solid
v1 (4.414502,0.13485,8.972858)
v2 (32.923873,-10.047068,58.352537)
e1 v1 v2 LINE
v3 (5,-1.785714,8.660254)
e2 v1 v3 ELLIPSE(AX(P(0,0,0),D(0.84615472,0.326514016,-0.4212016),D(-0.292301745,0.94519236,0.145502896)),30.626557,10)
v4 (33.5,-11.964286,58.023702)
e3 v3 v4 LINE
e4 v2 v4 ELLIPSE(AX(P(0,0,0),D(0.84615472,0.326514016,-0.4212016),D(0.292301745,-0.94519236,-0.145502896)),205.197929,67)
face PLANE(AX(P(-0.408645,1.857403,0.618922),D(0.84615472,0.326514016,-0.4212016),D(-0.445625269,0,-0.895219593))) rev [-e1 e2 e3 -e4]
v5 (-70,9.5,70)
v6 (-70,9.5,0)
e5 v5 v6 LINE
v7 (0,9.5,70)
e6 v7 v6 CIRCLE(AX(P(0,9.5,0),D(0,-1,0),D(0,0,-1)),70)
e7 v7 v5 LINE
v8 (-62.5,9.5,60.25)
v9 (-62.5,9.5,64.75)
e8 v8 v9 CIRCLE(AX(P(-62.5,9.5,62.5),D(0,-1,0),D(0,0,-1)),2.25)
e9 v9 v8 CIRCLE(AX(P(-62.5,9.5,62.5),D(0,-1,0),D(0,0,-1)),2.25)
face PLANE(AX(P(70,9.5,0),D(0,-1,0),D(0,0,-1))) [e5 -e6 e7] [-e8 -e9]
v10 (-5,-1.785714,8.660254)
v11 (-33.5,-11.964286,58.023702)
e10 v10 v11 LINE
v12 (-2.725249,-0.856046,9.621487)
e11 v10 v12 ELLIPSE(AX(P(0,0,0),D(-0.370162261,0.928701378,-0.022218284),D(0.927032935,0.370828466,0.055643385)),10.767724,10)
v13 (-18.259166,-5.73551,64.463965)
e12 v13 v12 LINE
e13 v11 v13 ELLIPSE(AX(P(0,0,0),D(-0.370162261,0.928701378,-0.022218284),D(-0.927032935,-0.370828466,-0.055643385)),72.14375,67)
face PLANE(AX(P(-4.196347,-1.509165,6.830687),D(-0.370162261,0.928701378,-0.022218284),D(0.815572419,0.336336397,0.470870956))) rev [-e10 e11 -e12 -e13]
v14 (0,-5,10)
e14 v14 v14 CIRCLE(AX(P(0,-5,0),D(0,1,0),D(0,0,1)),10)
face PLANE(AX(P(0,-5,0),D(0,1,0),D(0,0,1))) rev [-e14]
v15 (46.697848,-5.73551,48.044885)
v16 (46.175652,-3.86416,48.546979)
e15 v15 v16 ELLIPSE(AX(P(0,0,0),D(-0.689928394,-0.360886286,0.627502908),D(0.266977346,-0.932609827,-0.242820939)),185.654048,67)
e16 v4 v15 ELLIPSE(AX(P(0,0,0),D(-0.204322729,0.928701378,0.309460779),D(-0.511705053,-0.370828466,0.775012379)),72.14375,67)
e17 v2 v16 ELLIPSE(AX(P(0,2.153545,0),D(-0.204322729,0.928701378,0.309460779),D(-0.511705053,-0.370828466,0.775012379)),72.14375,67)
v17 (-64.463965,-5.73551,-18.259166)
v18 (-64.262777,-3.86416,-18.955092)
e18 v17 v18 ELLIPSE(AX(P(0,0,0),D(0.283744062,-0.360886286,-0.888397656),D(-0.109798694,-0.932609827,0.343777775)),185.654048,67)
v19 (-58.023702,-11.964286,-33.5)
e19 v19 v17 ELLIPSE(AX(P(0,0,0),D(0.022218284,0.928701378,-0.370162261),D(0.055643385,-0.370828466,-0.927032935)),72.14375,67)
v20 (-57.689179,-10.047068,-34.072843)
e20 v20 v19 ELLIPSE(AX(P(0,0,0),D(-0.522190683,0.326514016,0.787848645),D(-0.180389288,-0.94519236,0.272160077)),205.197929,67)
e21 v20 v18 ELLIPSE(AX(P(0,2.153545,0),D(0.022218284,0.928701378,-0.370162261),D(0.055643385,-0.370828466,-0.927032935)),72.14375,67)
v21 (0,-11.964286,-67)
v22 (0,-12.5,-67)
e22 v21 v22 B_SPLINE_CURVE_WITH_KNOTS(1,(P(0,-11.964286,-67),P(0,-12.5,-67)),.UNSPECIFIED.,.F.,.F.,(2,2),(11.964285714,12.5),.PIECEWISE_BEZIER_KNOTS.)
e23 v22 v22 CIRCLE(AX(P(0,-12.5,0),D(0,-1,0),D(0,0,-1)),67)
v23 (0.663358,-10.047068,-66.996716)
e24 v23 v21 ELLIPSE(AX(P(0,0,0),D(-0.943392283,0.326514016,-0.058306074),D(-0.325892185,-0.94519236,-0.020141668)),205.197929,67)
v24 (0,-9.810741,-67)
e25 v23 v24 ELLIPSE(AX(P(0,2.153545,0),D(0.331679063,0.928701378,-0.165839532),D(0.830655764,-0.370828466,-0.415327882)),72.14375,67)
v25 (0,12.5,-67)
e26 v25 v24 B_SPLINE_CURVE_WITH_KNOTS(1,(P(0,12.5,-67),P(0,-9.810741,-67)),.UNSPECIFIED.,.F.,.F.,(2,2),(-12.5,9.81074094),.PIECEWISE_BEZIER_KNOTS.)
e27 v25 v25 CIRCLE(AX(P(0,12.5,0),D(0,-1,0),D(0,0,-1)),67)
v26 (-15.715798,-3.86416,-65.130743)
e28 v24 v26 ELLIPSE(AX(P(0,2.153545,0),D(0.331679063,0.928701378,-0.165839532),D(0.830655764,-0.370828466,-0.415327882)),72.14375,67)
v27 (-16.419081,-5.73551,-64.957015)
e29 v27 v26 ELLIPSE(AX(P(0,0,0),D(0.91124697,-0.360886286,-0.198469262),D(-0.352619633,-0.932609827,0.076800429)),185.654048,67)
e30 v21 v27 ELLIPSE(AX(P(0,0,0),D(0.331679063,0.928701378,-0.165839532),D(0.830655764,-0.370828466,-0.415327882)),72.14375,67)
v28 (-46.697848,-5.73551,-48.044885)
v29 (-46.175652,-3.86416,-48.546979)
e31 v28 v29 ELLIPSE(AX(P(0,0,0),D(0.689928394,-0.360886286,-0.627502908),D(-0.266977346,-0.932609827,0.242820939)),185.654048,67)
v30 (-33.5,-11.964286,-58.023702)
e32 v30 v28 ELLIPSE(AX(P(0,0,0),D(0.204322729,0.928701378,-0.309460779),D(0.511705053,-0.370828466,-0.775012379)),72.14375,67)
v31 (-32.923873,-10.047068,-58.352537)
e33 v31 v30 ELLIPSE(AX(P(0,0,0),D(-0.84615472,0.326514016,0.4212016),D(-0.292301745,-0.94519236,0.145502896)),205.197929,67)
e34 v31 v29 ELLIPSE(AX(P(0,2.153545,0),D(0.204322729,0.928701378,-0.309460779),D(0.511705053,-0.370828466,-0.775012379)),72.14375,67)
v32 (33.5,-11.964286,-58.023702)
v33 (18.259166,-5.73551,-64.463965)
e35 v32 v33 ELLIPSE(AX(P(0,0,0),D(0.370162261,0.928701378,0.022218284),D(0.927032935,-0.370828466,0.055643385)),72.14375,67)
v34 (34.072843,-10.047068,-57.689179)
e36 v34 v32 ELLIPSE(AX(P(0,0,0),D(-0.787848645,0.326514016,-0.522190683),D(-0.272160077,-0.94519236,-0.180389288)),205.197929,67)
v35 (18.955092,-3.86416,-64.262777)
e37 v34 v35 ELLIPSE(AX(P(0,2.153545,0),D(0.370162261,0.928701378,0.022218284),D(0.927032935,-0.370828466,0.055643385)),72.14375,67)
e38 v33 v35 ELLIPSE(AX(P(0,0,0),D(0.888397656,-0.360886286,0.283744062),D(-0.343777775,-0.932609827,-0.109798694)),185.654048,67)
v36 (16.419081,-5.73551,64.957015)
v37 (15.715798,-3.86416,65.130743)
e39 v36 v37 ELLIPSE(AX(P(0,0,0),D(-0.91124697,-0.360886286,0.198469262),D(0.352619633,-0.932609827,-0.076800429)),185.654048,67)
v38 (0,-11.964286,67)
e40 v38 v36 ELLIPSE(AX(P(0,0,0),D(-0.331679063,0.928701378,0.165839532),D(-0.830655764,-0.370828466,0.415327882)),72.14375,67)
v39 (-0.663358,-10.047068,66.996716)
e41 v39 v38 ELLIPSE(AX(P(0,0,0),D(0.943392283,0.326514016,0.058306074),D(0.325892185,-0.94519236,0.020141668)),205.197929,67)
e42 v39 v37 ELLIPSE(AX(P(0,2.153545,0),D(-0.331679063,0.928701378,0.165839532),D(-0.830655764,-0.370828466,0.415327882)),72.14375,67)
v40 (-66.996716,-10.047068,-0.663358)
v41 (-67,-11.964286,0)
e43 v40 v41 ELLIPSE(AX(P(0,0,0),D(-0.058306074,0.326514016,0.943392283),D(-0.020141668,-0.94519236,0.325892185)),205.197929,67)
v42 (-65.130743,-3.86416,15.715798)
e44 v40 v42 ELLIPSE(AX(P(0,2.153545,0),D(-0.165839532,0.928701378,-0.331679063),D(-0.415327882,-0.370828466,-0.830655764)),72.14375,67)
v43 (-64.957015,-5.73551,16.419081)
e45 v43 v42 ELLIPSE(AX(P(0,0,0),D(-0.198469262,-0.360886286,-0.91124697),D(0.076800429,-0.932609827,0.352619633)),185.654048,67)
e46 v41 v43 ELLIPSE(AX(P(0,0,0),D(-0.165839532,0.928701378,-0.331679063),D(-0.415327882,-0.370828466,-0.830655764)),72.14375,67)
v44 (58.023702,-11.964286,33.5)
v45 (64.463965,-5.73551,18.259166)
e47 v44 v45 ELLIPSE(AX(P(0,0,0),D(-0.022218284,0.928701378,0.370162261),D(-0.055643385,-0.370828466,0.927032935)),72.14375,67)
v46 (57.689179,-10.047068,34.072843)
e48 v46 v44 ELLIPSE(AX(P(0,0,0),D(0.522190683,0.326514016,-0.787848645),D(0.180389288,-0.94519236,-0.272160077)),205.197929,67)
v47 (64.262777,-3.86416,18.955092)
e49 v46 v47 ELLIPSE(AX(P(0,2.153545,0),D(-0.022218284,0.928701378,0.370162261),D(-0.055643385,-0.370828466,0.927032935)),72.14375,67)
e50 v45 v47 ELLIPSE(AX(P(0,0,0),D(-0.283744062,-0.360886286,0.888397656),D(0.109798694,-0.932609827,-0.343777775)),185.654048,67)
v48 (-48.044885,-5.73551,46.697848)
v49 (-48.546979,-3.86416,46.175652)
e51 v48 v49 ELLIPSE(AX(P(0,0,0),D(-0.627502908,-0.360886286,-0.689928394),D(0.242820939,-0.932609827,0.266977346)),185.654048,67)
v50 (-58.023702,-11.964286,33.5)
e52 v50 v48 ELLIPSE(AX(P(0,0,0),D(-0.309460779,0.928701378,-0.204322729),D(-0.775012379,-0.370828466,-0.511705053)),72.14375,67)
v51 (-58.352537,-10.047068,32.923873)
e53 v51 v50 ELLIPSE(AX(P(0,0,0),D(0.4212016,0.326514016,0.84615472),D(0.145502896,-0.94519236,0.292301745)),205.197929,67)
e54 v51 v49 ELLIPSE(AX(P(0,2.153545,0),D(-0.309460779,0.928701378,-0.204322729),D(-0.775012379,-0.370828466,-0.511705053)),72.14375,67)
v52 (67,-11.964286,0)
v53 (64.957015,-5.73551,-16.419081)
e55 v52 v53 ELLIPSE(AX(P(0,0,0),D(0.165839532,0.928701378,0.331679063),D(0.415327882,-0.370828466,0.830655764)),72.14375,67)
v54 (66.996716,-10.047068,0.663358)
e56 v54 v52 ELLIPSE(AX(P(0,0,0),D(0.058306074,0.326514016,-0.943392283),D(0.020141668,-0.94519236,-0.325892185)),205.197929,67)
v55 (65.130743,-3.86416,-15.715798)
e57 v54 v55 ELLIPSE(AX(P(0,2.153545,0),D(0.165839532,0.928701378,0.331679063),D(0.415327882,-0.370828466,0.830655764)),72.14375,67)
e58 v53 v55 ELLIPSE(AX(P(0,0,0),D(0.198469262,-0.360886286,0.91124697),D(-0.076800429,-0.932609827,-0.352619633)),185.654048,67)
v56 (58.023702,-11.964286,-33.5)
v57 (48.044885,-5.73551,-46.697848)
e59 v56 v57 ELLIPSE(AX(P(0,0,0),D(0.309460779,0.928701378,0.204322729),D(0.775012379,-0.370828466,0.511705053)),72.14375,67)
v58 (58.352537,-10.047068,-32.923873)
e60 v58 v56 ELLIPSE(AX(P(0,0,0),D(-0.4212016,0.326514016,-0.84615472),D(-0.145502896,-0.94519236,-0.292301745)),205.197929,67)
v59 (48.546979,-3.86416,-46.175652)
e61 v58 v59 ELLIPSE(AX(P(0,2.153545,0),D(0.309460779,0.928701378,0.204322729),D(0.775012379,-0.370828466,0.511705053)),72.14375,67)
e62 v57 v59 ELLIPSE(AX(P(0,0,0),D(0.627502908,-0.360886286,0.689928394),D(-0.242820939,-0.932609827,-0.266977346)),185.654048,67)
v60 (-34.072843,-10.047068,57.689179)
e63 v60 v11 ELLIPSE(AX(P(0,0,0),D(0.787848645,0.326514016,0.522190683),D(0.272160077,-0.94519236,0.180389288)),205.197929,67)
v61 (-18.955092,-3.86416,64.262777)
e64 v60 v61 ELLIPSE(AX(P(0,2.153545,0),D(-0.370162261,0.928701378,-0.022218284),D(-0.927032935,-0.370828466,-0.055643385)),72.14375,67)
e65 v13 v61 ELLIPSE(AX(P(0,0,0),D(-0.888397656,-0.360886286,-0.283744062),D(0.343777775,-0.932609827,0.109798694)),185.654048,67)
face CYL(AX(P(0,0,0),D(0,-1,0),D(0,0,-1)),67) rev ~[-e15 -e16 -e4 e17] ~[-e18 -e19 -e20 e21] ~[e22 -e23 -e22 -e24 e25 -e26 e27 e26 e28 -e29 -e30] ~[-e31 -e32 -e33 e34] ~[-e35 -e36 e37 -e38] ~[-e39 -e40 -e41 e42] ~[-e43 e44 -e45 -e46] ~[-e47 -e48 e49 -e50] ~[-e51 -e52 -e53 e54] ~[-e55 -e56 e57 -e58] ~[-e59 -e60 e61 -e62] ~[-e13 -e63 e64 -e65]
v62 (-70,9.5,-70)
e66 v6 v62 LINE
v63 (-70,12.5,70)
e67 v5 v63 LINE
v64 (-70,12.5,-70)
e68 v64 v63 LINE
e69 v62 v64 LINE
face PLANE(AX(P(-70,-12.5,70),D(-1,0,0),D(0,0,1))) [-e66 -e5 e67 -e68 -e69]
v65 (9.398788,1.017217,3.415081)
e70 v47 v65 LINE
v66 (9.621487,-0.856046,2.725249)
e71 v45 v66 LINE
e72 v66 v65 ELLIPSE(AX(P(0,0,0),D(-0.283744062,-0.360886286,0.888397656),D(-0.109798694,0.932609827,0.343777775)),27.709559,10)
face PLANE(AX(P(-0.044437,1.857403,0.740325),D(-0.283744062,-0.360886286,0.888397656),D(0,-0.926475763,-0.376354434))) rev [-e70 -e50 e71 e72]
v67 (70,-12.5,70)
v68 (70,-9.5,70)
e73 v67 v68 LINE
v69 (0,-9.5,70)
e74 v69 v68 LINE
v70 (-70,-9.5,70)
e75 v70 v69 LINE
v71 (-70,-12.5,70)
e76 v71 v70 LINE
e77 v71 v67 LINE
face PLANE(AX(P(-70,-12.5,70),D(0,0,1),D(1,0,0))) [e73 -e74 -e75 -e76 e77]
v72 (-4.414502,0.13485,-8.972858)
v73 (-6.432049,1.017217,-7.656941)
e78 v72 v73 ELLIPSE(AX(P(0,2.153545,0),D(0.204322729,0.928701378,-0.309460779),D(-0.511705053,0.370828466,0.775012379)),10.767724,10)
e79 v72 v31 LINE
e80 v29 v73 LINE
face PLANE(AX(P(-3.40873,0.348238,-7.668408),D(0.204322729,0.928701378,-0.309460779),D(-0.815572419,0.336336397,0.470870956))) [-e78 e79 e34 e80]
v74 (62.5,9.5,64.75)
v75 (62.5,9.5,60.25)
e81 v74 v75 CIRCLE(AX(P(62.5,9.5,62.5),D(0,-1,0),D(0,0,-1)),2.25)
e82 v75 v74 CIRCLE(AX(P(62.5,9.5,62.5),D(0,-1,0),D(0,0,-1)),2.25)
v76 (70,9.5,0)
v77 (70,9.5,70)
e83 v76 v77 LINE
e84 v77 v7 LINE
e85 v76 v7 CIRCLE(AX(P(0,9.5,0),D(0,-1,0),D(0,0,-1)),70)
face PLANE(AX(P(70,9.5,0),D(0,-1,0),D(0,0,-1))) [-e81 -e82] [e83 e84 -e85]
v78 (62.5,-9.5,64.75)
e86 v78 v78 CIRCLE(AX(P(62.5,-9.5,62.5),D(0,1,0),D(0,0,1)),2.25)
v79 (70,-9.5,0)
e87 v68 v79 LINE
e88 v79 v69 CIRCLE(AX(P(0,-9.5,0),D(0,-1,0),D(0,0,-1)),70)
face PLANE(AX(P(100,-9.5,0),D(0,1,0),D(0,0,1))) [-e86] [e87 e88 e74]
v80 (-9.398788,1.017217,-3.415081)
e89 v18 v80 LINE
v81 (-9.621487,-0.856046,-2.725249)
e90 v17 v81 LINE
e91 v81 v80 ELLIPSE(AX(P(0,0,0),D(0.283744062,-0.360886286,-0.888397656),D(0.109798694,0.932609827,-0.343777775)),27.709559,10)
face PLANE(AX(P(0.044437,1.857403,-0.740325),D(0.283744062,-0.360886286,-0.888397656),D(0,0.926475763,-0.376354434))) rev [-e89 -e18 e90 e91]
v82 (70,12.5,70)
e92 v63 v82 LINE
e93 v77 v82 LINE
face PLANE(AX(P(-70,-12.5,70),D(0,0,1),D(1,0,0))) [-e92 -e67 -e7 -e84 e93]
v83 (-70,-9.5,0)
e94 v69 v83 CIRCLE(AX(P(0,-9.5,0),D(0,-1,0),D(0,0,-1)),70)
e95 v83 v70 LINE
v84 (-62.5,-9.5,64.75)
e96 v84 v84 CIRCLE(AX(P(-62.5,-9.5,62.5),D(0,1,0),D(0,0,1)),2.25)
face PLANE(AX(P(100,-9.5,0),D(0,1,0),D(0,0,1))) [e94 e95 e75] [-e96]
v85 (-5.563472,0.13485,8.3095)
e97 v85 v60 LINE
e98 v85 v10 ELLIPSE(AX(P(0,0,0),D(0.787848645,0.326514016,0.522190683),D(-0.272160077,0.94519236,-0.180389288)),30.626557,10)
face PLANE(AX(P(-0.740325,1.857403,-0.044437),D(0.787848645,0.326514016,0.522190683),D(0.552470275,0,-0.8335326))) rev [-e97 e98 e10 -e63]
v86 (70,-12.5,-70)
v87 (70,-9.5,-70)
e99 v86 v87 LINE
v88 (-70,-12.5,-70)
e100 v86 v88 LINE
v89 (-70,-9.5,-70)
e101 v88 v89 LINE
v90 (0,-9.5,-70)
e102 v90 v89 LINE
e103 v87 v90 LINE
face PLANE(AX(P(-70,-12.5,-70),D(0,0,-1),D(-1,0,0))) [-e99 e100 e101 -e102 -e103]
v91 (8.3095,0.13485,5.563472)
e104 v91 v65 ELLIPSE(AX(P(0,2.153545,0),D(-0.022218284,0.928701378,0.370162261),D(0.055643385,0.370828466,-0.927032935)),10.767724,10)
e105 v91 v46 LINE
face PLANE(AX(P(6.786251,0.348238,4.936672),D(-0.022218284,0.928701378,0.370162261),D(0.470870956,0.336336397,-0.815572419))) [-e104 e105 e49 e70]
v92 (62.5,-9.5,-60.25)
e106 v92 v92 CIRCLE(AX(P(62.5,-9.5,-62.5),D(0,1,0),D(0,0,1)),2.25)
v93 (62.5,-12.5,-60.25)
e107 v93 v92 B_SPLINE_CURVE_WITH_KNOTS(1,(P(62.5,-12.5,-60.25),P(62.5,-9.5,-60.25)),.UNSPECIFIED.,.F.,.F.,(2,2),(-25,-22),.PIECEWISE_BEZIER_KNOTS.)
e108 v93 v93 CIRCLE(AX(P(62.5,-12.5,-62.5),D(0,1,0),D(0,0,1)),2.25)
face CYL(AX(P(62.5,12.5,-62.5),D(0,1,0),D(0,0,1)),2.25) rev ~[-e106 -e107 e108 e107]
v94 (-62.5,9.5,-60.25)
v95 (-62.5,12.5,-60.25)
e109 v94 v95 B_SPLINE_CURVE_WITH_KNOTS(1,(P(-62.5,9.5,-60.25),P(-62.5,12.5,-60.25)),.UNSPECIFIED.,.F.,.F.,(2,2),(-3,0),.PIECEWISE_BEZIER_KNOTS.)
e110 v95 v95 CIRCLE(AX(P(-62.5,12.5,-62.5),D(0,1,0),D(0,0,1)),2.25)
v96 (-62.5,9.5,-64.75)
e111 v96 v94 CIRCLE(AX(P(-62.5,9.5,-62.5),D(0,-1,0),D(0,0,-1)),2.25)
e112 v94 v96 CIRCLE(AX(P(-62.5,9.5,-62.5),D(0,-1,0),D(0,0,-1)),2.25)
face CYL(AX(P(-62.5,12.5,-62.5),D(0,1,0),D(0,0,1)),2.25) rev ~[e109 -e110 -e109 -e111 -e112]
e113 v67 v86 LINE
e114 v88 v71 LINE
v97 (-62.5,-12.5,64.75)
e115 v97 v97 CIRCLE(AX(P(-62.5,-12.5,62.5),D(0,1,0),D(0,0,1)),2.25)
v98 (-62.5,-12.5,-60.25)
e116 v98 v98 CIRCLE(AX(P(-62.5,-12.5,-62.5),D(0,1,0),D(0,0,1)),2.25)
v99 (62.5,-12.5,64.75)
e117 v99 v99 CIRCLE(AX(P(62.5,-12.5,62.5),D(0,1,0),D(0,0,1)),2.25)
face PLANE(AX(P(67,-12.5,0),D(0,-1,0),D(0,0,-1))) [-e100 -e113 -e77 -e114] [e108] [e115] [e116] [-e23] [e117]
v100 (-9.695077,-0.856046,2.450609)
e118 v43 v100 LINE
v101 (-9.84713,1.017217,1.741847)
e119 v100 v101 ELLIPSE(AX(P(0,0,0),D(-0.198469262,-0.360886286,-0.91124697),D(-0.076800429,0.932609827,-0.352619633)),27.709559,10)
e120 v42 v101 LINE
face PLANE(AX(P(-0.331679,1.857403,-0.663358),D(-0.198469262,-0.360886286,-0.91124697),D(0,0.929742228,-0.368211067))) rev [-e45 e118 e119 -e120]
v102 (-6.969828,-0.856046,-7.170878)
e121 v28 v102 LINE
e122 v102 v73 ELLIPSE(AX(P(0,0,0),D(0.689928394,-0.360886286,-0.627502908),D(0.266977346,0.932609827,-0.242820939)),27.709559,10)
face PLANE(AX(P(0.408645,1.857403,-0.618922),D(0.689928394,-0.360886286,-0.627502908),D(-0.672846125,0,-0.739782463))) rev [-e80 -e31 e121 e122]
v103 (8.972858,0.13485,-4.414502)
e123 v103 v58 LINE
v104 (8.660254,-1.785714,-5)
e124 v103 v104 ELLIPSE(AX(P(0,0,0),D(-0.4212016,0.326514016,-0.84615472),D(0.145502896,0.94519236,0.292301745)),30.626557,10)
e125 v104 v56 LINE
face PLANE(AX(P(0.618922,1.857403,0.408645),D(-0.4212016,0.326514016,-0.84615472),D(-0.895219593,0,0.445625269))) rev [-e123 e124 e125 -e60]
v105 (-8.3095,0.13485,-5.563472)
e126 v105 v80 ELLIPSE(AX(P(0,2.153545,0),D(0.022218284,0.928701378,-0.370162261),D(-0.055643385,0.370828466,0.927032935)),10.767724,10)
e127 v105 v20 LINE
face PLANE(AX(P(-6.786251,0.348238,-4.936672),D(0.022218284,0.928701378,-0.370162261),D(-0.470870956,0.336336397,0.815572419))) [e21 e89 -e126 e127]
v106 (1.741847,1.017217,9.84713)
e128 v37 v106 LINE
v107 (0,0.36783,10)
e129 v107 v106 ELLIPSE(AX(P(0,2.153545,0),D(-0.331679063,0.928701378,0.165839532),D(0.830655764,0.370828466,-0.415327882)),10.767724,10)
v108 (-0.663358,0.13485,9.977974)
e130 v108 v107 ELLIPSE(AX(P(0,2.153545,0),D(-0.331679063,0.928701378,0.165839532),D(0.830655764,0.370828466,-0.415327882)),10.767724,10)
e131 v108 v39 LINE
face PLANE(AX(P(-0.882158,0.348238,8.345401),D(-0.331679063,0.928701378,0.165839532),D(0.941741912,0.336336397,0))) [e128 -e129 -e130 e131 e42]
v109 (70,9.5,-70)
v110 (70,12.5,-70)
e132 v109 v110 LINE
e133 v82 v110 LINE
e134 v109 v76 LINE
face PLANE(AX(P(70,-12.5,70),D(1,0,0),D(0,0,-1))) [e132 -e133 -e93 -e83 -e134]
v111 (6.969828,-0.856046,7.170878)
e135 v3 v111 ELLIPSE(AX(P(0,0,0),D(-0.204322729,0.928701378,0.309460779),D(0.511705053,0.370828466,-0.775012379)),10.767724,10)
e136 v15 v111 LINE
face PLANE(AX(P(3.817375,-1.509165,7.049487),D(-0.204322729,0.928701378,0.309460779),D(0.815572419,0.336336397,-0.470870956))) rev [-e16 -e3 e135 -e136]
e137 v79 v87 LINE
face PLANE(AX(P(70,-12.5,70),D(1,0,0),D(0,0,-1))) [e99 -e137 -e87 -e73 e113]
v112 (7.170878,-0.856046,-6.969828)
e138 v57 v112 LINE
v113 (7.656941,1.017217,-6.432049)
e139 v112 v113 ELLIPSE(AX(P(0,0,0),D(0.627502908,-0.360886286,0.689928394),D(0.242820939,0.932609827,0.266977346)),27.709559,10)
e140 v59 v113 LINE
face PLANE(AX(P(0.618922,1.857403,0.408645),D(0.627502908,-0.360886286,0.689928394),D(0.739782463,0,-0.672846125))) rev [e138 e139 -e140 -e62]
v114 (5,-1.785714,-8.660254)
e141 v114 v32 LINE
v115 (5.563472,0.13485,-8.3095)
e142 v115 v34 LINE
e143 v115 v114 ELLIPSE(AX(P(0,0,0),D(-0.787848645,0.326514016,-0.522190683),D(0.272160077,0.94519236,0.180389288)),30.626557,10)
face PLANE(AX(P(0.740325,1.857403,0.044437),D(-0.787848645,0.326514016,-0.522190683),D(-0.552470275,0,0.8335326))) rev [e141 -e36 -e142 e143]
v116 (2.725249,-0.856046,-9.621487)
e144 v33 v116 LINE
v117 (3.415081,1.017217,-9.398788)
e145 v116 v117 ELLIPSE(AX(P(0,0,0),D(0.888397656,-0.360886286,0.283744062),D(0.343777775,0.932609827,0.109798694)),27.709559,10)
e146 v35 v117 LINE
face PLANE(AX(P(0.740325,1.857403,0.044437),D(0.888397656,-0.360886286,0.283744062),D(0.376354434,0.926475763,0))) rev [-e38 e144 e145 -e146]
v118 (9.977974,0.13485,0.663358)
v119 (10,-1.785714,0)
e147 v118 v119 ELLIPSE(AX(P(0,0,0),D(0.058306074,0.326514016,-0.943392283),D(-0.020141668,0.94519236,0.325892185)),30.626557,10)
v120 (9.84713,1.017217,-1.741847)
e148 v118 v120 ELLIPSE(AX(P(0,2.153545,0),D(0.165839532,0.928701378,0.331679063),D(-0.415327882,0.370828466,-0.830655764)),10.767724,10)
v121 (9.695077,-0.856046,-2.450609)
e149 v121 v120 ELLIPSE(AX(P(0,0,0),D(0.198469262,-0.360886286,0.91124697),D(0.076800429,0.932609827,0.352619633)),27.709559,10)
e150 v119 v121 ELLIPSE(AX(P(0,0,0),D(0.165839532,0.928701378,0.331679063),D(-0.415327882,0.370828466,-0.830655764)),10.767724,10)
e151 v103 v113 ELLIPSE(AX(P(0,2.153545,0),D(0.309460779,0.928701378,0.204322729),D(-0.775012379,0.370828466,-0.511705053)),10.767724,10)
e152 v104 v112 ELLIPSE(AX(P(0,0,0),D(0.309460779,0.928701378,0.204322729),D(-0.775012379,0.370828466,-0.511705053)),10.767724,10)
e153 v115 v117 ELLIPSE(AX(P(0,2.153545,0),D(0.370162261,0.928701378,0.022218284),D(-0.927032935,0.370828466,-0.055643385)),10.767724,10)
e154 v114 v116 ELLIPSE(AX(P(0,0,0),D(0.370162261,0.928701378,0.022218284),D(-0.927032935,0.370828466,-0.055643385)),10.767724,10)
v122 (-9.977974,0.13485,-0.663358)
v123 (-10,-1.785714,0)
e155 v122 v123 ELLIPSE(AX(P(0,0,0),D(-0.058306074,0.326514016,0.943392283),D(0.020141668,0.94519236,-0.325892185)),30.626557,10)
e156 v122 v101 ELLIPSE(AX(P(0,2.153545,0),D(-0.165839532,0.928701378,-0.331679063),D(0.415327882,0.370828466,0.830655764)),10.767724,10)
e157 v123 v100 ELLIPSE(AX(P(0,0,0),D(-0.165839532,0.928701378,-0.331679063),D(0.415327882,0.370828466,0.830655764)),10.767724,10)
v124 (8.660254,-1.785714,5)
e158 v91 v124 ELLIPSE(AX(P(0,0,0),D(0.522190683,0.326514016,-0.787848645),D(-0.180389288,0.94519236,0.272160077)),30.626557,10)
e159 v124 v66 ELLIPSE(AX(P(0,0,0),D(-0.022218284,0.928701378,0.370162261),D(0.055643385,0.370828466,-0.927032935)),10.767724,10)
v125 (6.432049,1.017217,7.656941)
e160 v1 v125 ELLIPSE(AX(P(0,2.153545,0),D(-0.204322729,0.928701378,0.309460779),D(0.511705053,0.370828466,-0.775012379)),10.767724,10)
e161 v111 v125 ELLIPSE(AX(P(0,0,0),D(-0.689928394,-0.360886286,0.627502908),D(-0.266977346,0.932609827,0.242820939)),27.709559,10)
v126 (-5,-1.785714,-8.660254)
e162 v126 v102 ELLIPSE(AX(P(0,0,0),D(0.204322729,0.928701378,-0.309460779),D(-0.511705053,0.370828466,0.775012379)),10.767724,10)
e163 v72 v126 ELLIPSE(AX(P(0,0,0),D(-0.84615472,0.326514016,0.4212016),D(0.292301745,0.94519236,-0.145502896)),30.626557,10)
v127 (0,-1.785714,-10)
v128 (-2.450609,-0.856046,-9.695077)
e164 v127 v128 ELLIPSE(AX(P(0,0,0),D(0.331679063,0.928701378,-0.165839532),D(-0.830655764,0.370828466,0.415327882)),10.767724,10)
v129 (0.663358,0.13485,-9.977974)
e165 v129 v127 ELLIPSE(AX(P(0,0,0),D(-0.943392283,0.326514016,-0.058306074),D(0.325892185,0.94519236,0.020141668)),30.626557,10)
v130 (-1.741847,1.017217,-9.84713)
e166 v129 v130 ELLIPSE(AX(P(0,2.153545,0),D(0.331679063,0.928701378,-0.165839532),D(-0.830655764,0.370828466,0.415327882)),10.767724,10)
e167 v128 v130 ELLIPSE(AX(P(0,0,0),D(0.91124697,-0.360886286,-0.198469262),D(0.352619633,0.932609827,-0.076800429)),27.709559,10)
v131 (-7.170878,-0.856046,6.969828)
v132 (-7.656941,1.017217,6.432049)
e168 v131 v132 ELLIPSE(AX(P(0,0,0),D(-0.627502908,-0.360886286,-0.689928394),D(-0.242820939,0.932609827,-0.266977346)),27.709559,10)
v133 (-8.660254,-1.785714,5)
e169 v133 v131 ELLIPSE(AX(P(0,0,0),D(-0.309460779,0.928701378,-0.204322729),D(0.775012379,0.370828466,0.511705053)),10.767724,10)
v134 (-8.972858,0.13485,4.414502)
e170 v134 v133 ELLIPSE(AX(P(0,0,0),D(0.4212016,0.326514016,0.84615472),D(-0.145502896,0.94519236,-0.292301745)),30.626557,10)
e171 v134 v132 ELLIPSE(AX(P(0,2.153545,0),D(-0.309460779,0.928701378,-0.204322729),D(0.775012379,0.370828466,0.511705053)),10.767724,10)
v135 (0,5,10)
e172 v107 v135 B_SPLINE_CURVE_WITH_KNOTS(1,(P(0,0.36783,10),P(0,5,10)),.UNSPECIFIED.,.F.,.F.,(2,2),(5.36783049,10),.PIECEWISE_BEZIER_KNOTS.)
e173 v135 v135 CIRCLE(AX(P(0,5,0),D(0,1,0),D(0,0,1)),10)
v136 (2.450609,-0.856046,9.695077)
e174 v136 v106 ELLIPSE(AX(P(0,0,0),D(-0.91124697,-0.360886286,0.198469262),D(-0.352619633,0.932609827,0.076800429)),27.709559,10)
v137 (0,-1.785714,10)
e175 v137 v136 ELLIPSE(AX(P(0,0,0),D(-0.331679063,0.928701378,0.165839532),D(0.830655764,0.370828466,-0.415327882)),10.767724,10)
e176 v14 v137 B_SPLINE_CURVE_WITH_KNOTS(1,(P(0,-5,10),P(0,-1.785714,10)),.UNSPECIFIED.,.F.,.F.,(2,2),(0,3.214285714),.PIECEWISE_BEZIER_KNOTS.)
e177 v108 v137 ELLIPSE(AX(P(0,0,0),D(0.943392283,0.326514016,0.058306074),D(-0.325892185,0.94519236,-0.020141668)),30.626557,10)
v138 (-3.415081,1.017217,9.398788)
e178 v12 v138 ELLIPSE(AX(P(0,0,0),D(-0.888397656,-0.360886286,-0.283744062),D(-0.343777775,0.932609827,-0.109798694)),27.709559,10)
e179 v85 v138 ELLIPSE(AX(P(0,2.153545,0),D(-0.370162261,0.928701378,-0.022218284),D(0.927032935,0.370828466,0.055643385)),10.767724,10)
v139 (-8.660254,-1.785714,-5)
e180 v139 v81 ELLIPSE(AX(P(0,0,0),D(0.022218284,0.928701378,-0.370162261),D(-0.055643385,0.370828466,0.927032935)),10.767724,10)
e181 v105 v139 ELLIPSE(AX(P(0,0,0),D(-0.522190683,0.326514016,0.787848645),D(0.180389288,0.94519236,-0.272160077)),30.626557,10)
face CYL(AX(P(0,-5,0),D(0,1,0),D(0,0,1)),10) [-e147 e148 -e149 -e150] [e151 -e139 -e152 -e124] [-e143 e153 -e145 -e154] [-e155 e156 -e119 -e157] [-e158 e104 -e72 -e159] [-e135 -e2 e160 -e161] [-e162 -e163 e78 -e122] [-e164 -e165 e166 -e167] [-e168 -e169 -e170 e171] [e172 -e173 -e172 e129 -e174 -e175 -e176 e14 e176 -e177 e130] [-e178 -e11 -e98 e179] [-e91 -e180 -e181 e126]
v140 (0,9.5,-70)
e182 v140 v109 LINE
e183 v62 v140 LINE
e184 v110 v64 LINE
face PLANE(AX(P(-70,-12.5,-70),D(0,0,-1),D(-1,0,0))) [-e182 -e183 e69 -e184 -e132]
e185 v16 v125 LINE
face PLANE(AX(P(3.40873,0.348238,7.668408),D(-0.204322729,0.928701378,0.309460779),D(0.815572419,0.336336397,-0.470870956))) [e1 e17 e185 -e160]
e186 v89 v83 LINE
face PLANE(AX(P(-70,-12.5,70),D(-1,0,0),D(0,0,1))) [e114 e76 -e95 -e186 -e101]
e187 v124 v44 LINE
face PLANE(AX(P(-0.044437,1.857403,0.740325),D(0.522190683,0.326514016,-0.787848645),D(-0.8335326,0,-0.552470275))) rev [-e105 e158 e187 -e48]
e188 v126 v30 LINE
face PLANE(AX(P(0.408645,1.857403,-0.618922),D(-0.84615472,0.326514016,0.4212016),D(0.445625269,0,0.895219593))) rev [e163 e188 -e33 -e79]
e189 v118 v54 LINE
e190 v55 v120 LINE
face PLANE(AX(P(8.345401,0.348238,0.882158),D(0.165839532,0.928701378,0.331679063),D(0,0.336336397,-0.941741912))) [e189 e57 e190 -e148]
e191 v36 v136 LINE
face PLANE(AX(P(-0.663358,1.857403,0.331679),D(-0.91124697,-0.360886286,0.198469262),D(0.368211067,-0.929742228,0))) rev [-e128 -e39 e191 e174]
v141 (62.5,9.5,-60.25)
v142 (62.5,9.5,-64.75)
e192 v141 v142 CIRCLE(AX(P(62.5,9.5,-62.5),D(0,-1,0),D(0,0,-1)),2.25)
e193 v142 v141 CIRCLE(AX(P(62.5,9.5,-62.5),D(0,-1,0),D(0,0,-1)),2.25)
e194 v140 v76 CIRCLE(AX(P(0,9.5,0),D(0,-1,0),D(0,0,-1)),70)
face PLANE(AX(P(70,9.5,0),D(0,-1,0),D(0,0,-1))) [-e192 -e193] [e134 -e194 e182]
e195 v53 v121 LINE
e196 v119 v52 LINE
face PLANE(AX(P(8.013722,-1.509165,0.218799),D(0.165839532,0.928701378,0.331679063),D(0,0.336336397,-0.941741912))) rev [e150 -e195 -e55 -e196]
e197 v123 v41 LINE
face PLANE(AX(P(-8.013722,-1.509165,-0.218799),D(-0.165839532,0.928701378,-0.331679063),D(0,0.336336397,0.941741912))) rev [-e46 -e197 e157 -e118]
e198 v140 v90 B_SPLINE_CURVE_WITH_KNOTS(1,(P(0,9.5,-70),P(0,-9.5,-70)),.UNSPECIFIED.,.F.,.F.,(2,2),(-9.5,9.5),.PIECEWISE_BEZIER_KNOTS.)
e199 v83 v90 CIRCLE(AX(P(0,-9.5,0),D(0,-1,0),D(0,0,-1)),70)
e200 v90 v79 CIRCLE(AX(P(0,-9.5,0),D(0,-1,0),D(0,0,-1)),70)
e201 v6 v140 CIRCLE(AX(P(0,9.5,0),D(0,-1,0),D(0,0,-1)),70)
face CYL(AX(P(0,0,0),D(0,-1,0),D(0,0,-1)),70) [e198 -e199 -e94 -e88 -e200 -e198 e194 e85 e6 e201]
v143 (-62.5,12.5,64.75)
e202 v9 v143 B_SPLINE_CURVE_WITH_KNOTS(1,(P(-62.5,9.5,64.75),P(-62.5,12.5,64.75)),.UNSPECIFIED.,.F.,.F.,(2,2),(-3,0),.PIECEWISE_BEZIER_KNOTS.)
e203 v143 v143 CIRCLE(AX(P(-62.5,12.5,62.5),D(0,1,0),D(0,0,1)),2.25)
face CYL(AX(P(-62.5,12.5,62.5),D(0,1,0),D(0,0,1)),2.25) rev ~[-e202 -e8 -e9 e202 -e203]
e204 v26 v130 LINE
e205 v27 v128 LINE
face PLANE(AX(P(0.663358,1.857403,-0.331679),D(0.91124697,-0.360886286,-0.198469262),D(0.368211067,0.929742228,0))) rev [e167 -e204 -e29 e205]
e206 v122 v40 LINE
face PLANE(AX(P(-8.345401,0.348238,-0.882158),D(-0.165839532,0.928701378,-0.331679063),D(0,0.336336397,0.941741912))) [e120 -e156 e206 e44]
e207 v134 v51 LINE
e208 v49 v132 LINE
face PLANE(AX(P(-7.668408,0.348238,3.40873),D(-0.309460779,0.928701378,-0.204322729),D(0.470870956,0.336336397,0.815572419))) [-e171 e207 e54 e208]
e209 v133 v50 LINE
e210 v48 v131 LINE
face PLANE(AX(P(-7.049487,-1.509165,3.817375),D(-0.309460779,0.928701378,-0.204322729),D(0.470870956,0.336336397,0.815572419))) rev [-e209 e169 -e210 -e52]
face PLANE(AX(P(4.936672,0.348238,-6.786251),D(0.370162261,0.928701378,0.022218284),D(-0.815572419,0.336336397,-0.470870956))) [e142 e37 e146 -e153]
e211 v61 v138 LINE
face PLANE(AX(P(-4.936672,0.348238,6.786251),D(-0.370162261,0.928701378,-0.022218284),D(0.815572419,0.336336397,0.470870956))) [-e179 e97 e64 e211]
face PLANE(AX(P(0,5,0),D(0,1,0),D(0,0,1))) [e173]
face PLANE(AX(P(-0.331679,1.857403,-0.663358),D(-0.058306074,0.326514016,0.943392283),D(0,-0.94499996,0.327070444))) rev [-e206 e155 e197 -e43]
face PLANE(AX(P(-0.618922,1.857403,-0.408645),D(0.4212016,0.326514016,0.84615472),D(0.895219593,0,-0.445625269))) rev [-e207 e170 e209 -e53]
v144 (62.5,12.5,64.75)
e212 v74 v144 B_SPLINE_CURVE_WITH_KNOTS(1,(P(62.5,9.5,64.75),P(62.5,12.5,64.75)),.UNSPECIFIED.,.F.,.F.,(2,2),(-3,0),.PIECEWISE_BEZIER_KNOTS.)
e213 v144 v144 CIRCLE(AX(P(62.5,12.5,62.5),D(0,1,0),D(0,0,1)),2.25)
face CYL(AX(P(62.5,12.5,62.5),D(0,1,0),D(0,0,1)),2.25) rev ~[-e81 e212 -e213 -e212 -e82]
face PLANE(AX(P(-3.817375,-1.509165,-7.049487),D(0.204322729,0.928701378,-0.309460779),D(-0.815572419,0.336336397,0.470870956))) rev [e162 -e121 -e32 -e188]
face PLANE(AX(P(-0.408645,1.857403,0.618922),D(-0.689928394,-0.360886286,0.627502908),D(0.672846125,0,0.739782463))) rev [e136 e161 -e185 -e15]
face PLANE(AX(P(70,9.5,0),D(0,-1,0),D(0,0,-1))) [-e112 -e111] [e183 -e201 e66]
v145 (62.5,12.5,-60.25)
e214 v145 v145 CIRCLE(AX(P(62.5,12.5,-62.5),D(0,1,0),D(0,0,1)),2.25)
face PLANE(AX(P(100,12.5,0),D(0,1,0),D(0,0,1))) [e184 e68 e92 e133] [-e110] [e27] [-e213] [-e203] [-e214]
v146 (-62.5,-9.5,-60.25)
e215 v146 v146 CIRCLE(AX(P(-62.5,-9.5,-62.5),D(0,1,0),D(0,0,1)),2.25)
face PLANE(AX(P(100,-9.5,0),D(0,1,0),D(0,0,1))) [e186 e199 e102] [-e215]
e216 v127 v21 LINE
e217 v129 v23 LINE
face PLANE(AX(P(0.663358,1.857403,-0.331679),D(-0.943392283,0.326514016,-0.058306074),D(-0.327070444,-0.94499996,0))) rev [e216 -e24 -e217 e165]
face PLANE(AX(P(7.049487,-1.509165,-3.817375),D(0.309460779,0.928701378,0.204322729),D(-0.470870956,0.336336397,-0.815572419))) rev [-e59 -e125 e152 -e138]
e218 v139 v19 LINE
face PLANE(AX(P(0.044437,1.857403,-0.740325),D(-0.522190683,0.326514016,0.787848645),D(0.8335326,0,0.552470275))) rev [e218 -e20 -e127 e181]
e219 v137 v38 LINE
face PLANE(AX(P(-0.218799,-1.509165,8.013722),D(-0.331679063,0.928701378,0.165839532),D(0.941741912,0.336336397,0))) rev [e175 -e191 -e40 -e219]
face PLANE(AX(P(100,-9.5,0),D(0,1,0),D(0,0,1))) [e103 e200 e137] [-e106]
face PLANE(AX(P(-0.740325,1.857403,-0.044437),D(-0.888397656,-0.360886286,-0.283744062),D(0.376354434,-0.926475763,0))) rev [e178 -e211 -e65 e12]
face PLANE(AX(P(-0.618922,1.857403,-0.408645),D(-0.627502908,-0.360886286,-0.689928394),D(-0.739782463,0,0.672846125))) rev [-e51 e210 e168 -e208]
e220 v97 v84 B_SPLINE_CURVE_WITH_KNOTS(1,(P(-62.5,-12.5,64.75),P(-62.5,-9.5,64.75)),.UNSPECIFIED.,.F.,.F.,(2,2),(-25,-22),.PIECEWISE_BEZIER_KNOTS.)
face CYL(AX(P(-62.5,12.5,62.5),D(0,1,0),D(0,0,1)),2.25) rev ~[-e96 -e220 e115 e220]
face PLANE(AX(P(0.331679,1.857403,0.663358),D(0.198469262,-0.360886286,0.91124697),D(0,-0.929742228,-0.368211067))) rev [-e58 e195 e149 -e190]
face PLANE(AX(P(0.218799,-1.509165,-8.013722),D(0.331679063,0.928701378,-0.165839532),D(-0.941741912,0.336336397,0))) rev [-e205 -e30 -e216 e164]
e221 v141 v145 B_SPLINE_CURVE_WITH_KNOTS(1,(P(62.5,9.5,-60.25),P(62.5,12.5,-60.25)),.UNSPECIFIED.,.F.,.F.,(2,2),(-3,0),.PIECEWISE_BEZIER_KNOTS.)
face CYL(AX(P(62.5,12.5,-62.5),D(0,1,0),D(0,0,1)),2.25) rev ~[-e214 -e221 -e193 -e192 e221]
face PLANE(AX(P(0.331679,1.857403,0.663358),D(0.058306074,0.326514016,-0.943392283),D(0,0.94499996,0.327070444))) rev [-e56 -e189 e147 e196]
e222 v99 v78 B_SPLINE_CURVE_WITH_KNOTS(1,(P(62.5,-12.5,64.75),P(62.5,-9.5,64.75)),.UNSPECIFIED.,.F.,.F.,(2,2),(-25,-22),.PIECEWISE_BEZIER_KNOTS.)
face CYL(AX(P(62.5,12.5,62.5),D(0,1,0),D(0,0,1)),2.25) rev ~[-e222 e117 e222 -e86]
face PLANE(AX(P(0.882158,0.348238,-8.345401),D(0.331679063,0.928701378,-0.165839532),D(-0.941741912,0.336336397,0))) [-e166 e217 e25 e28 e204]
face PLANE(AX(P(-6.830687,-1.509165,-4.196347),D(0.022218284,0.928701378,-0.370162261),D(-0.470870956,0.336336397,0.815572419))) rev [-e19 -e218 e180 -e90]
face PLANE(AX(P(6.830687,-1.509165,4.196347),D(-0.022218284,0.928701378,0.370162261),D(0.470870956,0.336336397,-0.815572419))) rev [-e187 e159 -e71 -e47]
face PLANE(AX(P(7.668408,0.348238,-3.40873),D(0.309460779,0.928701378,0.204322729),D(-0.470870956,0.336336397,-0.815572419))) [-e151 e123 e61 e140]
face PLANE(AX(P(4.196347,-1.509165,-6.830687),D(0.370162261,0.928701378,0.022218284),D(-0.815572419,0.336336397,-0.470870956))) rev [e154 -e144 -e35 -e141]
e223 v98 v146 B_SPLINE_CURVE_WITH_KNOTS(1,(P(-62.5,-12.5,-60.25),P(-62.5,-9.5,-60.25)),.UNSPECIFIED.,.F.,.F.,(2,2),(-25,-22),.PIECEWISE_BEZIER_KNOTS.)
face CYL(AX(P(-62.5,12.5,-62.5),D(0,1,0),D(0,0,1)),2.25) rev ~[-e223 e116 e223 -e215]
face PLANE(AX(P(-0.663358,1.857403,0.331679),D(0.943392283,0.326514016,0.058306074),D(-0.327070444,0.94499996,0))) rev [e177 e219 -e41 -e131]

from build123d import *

# Parameters (mm, degrees)
SKETCH2_OUTSIDE_W         = 258.79
SKETCH2_OUTSIDE_H         = 258.79
SKETCH2_OUTSIDE_W_2       = 140
SKETCH2_OUTSIDE_H_2       = 140
SQUARE_SHAPE_CUTOUT_DEPTH = 144.614066163
MOUNTING_HOLES_START      = -12.5
MOUNTING_HOLES_OUTLINE_R  = 2.25
MOUNTING_HOLES_DEPTH      = 25
FAN_WING_DEPTH            = 2
BOSS_EXTRUDE2_DEPTH       = 5
BOSS_EXTRUDE2_DEPTH_BACK  = 5
SKETCH7_R                 = 10
CIRPATTERN3_COUNT         = 12


# Read off the part's stored shape, not the designer's step: mounting_holes
with BuildPart() as part:
    # Sketch1 → body (revolve)
    with BuildSketch(Plane.XY, mode=Mode.PRIVATE) as body_sk:
        Polygon((67, -12.5), (100, -12.5), (100, -9.5), (70, -9.5), (70, 9.5), (100, 9.5), (100, 12.5), (67, 12.5), align=None)
    revolve(body_sk.sketch.rotate(Axis((0, 0, 0), (0, 1, 0)), 90), axis=Axis((0, 0, 0), (0, 1, 0)))

    # Sketch2 outside → square_shape_cutout (cut, through all)
    with BuildSketch(Plane(origin=(0, 12.5, 0), x_dir=(1, 0, 0), z_dir=(0, 1, 0))):
        Rectangle(SKETCH2_OUTSIDE_W, SKETCH2_OUTSIDE_H)
        Rectangle(SKETCH2_OUTSIDE_W_2, SKETCH2_OUTSIDE_H_2, mode=Mode.SUBTRACT)
    extrude(amount=-SQUARE_SHAPE_CUTOUT_DEPTH, mode=Mode.SUBTRACT)

    # mounting_holes outline → mounting_holes (cut)
    with BuildSketch(Plane(origin=(0, 0, 0), x_dir=(1, 0, 0), z_dir=(0, 1, 0)).offset(MOUNTING_HOLES_START)):
        with Locations((62.5, 62.5)):
            Circle(MOUNTING_HOLES_OUTLINE_R)
        with Locations((-62.5, -62.5)):
            Circle(MOUNTING_HOLES_OUTLINE_R)
        with Locations((62.5, -62.5)):
            Circle(MOUNTING_HOLES_OUTLINE_R)
        with Locations((-62.5, 62.5)):
            Circle(MOUNTING_HOLES_OUTLINE_R)
    extrude(amount=MOUNTING_HOLES_DEPTH, mode=Mode.SUBTRACT)

    # Sketch6 → fan_wing (add)
    with BuildSketch(Plane(origin=(0, 0, 0), x_dir=(0.9433922826162455, -0.3265140162330641, 0.058306074327332945), z_dir=(0.33167906340332987, 0.9287013775293232, -0.16583953170166502))):
        with BuildLine():
            Line((0, 0), (0, 68.153777936))
            ThreePointArc((0, 68.153777936), (-8.870280209, 67.459789157), (-17.540404137, 65.461679426))
            Line((-17.540404137, 65.461679426), (0, 0))
        make_face()
    fan_wing = extrude(amount=FAN_WING_DEPTH)

    # Sketch7 → Boss-Extrude2 (add, two sides: drawn at the far end of the back side and taken through both)
    with BuildSketch(Plane(origin=(0, 0, 0), x_dir=(1, 0, 0), z_dir=(0, 1, 0)).offset(-BOSS_EXTRUDE2_DEPTH_BACK)):
        with Locations(Location((0, 0, 0), (0, 0, 270))):
            Circle(SKETCH7_R)
    extrude(amount=BOSS_EXTRUDE2_DEPTH + BOSS_EXTRUDE2_DEPTH_BACK)

    # CirPattern3: fan_wing ×12 about axis
    cirpattern3_axis = Axis((0, 0, 0), (0, 1, 0))
    for i in range(1, CIRPATTERN3_COUNT):
        add(fan_wing.rotate(cirpattern3_axis, i * 360 / CIRPATTERN3_COUNT))


solid = part.part
